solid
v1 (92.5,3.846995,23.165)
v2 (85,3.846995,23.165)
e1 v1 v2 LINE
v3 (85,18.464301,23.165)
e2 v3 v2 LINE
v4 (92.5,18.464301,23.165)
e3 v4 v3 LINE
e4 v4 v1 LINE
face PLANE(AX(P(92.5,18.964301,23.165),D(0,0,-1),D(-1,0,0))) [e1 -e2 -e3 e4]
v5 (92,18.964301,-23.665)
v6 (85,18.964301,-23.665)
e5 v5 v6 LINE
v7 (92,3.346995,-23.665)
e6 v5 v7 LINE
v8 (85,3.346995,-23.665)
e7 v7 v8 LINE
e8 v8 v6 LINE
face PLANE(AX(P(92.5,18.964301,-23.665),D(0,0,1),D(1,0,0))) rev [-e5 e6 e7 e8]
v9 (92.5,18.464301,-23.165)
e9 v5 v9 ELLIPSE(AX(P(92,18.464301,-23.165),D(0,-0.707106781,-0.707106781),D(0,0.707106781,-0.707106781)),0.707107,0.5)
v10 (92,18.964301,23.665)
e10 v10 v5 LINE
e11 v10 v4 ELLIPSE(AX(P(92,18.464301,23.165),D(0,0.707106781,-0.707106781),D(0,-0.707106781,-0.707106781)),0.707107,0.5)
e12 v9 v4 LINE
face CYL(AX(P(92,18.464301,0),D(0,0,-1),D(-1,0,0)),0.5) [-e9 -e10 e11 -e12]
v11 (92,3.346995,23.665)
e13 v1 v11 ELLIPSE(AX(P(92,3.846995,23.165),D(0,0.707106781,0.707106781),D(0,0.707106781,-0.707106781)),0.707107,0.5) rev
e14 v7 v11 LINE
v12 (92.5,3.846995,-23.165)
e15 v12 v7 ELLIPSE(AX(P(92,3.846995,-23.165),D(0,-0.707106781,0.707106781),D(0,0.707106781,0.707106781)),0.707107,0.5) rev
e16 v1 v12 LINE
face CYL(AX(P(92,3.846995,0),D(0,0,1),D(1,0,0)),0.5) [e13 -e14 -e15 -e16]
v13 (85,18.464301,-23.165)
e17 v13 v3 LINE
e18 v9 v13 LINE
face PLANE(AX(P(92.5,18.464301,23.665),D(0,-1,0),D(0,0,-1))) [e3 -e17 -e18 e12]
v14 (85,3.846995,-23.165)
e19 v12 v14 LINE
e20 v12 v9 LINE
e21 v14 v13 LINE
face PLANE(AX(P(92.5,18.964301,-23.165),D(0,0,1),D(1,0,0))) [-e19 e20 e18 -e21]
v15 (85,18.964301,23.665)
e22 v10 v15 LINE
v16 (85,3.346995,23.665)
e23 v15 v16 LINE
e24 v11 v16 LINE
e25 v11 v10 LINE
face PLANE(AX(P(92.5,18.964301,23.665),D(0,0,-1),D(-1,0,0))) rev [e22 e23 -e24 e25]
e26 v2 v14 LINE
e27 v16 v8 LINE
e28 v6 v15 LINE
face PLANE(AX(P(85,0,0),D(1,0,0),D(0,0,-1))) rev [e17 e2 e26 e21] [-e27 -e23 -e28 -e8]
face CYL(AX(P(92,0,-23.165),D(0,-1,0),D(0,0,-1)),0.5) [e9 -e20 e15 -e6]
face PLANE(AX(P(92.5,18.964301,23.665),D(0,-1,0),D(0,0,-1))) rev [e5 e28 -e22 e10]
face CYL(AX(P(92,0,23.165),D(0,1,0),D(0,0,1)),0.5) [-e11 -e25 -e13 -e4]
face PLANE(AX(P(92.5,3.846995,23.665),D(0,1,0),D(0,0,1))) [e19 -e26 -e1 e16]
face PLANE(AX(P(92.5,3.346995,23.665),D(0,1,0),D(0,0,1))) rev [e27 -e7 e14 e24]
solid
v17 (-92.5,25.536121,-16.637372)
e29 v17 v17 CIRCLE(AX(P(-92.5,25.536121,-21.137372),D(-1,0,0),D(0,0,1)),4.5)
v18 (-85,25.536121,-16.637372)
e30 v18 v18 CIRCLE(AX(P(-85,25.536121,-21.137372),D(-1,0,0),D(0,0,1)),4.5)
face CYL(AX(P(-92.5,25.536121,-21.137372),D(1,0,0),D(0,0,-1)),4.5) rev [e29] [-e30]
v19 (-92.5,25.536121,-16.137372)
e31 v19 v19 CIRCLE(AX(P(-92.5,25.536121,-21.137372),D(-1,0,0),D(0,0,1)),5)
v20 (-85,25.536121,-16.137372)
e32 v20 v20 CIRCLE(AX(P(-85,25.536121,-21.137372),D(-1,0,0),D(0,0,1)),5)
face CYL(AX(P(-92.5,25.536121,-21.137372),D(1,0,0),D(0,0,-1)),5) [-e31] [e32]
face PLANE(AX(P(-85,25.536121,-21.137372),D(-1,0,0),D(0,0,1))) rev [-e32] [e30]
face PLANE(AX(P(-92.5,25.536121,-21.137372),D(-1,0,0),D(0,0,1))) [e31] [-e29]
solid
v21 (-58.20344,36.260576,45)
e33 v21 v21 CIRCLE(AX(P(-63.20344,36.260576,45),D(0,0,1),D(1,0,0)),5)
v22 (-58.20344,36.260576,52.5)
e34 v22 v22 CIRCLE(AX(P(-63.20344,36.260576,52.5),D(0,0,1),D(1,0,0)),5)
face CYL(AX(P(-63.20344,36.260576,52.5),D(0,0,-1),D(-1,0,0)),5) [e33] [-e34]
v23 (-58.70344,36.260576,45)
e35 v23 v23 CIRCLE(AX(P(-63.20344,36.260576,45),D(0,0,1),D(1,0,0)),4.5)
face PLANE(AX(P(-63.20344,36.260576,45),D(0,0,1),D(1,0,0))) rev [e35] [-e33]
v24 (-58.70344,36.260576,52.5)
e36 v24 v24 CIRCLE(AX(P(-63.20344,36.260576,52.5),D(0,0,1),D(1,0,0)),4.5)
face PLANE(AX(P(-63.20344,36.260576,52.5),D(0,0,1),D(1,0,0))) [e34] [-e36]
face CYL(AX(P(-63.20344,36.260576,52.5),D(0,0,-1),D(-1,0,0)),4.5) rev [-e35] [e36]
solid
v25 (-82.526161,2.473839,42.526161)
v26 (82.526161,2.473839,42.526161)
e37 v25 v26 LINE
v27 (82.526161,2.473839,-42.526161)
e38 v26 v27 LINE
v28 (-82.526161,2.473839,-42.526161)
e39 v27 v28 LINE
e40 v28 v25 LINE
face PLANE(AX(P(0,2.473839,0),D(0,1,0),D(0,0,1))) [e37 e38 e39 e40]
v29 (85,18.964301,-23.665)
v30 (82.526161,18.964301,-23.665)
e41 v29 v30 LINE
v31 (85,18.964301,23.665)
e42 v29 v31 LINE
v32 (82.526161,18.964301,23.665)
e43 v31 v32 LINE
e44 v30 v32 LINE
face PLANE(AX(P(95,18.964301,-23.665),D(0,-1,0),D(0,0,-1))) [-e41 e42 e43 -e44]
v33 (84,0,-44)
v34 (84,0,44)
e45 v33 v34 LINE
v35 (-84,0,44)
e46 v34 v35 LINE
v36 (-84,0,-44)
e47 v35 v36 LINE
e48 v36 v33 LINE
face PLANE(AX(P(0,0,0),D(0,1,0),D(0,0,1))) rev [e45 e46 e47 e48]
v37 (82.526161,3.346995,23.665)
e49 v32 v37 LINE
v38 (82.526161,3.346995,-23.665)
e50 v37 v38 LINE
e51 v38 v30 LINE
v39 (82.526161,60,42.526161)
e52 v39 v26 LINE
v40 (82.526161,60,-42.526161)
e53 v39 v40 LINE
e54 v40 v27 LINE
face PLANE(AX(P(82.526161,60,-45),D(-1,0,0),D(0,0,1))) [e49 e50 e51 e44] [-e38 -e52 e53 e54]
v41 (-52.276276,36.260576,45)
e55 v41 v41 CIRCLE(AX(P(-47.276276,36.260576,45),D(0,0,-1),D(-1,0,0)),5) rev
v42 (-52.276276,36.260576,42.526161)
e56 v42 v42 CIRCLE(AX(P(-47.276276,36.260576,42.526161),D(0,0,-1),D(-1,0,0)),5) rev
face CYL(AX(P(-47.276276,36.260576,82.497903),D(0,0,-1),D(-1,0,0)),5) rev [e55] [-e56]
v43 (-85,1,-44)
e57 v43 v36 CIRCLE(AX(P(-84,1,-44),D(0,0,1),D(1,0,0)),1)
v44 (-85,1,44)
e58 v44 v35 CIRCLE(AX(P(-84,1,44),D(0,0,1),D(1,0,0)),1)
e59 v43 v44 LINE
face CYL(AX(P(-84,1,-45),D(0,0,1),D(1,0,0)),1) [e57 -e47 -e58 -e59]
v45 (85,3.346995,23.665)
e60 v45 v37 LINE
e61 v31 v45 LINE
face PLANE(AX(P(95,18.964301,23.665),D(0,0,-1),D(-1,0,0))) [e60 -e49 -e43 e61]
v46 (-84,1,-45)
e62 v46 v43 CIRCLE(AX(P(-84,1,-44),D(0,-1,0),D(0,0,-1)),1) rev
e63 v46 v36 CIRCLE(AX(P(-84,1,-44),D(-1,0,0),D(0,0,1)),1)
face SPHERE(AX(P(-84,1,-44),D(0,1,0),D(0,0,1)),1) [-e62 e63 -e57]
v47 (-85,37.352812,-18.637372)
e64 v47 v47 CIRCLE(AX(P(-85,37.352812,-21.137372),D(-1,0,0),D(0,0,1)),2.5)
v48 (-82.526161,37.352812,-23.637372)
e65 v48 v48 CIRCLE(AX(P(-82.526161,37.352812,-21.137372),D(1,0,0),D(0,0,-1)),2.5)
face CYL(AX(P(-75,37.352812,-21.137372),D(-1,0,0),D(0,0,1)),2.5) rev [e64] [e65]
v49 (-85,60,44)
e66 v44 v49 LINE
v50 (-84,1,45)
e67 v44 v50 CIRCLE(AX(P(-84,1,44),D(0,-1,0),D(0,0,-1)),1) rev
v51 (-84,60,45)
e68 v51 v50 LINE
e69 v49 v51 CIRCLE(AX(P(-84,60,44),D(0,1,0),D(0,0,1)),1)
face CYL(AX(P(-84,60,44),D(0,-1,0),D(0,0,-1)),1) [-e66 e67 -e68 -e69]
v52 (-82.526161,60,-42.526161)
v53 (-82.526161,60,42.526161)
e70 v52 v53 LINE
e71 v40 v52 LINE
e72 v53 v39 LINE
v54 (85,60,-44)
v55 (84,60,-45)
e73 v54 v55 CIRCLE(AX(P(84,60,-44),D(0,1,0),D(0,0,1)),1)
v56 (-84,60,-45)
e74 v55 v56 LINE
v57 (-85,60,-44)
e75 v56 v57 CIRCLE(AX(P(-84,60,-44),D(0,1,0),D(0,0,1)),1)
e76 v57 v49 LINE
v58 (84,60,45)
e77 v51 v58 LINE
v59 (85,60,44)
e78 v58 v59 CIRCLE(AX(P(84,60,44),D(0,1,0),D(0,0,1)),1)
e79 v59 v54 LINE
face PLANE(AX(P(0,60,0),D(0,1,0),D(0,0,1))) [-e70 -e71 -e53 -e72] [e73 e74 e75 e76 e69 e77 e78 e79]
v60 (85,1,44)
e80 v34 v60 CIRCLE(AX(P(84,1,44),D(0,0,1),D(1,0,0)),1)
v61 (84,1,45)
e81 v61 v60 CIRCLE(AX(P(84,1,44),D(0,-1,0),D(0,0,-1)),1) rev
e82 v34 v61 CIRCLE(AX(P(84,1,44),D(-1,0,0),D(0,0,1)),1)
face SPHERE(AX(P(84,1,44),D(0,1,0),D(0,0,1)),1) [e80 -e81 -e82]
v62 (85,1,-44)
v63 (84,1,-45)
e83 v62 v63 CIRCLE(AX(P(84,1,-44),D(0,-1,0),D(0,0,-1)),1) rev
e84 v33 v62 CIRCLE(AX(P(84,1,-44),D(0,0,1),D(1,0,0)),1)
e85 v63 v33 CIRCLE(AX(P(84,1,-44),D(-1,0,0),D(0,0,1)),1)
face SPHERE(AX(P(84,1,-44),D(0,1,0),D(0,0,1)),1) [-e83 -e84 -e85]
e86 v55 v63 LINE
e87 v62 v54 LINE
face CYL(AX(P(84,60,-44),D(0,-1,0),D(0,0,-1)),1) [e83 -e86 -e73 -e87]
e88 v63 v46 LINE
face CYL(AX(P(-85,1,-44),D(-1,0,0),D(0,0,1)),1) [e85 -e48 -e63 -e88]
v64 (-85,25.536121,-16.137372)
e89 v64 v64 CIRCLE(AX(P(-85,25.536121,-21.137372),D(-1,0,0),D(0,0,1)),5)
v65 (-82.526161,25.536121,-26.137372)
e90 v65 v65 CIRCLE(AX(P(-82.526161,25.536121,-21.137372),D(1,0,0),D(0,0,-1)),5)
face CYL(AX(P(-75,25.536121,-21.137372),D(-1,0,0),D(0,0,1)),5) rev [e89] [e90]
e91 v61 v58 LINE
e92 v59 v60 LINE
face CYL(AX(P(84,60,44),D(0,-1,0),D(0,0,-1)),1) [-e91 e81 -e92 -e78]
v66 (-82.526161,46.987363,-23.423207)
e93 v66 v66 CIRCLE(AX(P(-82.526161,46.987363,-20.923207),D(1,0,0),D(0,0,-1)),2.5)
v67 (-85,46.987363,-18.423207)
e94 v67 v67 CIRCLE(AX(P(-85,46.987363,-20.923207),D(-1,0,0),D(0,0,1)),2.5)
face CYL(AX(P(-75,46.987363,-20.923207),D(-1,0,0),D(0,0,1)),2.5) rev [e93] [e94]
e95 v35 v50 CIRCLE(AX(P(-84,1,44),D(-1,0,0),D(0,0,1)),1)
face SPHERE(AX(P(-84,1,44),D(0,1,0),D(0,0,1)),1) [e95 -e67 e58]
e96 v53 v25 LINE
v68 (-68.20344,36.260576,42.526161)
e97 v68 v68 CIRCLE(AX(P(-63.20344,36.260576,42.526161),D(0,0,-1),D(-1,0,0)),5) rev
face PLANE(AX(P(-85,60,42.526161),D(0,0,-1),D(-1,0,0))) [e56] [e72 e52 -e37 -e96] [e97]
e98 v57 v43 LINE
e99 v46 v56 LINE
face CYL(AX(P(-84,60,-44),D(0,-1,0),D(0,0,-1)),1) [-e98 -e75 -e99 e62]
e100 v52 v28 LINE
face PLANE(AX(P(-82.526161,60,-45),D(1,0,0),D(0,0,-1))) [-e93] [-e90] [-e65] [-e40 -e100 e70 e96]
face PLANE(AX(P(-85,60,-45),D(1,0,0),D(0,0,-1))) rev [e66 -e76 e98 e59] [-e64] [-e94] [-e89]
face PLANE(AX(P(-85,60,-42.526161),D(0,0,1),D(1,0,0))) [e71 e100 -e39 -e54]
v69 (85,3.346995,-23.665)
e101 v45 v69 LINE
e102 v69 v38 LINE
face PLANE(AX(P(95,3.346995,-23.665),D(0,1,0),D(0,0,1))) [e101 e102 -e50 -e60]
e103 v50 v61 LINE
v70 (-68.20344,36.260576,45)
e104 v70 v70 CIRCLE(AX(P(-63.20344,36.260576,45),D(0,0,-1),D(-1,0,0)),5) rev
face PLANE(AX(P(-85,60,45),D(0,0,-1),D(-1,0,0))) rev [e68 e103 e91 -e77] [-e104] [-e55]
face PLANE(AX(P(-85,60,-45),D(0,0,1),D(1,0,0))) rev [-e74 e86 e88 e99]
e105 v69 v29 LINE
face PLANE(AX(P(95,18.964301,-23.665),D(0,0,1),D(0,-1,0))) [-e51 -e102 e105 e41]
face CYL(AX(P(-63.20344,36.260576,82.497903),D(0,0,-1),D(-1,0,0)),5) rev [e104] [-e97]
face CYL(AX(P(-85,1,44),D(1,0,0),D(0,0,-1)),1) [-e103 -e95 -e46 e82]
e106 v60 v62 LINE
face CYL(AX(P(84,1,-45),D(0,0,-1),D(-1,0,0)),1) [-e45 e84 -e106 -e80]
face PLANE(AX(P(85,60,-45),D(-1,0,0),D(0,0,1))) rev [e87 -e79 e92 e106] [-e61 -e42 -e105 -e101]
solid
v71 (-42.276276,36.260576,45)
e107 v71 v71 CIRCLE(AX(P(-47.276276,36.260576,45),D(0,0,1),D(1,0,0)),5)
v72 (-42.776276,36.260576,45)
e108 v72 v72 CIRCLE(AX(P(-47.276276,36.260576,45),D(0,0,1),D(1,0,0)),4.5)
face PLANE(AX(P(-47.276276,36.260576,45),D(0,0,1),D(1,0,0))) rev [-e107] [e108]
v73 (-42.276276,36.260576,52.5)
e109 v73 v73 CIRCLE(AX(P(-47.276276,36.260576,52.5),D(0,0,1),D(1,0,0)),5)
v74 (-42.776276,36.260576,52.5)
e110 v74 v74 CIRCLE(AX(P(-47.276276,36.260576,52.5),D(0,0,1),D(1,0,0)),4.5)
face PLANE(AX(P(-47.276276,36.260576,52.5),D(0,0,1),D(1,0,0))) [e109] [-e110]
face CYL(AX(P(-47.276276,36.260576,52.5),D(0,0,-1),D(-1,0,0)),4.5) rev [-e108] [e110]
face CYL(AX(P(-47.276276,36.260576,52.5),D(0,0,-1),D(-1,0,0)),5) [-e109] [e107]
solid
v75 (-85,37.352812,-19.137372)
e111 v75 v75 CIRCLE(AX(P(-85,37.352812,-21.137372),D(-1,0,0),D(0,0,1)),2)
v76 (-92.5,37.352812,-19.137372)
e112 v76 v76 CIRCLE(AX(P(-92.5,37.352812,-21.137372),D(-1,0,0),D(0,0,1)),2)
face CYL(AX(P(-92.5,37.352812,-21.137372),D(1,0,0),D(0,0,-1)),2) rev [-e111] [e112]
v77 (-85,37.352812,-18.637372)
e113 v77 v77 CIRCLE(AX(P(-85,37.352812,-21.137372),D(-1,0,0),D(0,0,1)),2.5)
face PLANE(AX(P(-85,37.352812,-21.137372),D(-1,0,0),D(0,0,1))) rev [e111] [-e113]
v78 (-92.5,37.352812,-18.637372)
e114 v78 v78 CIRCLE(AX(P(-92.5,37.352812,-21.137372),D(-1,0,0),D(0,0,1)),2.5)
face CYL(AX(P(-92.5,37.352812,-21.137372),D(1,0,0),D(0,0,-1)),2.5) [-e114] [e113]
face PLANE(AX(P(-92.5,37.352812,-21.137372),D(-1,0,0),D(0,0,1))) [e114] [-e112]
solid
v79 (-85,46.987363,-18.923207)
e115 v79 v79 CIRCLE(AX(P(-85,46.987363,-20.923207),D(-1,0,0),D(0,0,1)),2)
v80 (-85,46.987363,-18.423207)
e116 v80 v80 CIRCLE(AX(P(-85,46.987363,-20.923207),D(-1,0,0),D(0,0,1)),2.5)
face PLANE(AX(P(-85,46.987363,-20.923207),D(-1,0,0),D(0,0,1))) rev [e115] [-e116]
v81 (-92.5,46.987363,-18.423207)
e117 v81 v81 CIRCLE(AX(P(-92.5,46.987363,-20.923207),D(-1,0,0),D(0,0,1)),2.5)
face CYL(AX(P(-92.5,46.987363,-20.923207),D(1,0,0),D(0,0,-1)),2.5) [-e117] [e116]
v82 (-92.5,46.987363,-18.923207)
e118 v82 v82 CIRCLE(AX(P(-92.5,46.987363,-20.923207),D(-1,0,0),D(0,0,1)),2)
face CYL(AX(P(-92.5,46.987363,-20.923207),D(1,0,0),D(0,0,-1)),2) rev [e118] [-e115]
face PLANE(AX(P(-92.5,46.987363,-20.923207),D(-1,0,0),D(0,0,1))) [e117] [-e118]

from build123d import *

# Parameters (mm, degrees)
SKETCH1_W             = 170
SKETCH1_H             = 90
BOSS_EXTRUDE2_DEPTH   = 60
SHELL2_T              = -2.473839036
SKETCH4_W             = 47.329999632
SKETCH4_H             = 15.617306276
CUT_EXTRUDE3_DEPTH    = 95
SKETCH5_R             = 5
CUT_EXTRUDE4_DEPTH    = 82.49790304
SKETCH11_R            = 2.5
CUT_EXTRUDE5_DEPTH    = 10
SKETCH12_R            = 2.5
CUT_EXTRUDE6_DEPTH    = 10
SKETCH13_R            = 5
CUT_EXTRUDE7_DEPTH    = 10
SKETCH18_R            = 2.5
BOSS_EXTRUDE4_DEPTH   = 7.5
SHELL5_T              = -0.5
SKETCH19_R            = 2.5
BOSS_EXTRUDE5_DEPTH   = 7.5
SHELL6_T              = -0.5
SKETCH20_R            = 5
BOSS_EXTRUDE6_DEPTH   = 7.5
SHELL7_T              = -0.5
SKETCH21_R            = 5
BOSS_EXTRUDE7_DEPTH   = 7.5
BOSS_EXTRUDE7_2_DEPTH = 7.5
SHELL8_T              = -0.5
SHELL9_T              = -0.5
SKETCH23_W            = 47.329999632
SKETCH23_H            = 15.617306276
BOSS_EXTRUDE8_DEPTH   = 7.5
SHELL10_T             = -0.5
FILLET1_START         = 2
FILLET1_DEPTH         = 18
FILLET1_START_2       = -25
FILLET1_2_DEPTH       = 50
FILLET3_R             = 1
FILLET4_R             = 1


with BuildPart() as part:
    # Sketch1 → Boss-Extrude2 (new body)
    with BuildSketch(Plane(origin=(0, 0, 0), x_dir=(1, 0, 0), z_dir=(0, 1, 0))):
        Rectangle(SKETCH1_W, SKETCH1_H)
    extrude(amount=BOSS_EXTRUDE2_DEPTH)

    # Shell2
    shell2_openings = [part.faces().sort_by_distance(p)[0] for p in [
        (0, 60, 0),
    ]]
    offset(amount=SHELL2_T, openings=shell2_openings, kind=Kind.INTERSECTION)

    # Sketch4 → Cut-Extrude3 (cut)
    with BuildSketch(Plane(origin=(0, 0, 0), x_dir=(0, 0, -1), z_dir=(1, 0, 0))):
        with Locations((0, 11.155648294)):
            Rectangle(SKETCH4_W, SKETCH4_H)
    extrude(amount=CUT_EXTRUDE3_DEPTH, mode=Mode.SUBTRACT)

    # Sketch5 → Cut-Extrude4 (cut)
    with BuildSketch(Plane.XY):
        with Locations(Location((-63.203440073, 36.260575633, 0), (0, 0, 180))):
            Circle(SKETCH5_R)
        with Locations(Location((-47.276275906, 36.260575633, 0), (0, 0, 180))):
            Circle(SKETCH5_R)
    extrude(amount=CUT_EXTRUDE4_DEPTH, mode=Mode.SUBTRACT)

    # Sketch11 → Cut-Extrude5 (cut)
    with BuildSketch(Plane.ZY.offset(85)):
        with Locations((-20.923207268, 46.987362625)):
            Circle(SKETCH11_R)
    extrude(amount=-CUT_EXTRUDE5_DEPTH, mode=Mode.SUBTRACT)

    # Sketch12 → Cut-Extrude6 (cut)
    with BuildSketch(Plane.ZY.offset(85)):
        with Locations((-21.137371962, 37.352812096)):
            Circle(SKETCH12_R)
    extrude(amount=-CUT_EXTRUDE6_DEPTH, mode=Mode.SUBTRACT)

    # Sketch13 → Cut-Extrude7 (cut)
    with BuildSketch(Plane.ZY.offset(85)):
        with Locations((-21.137371962, 25.536121377)):
            Circle(SKETCH13_R)
    extrude(amount=-CUT_EXTRUDE7_DEPTH, mode=Mode.SUBTRACT)

    # Fillet3
    fillet3_edges = [part.edges().sort_by_distance(p)[0] for p in [
        (85, 30, 45),
        (-85, 30, 45),
        (-85, 30, -45),
        (85, 30, -45),
    ]]
    fillet(fillet3_edges, radius=FILLET3_R)

    # Fillet4
    fillet4_edges = [part.edges().sort_by_distance(p)[0] for p in [
        (-85, 0, 0),
        (85, 0, 0),
        (0, 0, 45),
        (0, 0, -45),
        (84.707106781, 0, 44.707106781),
        (-84.707106781, 0, 44.707106781),
        (84.707106781, 0, -44.707106781),
        (-84.707106781, 0, -44.707106781),
    ]]
    fillet(fillet4_edges, radius=FILLET4_R)


with BuildPart() as body_2:
    # Sketch18 → Boss-Extrude4 (new body)
    with BuildSketch(Plane.ZY.offset(85)):
        with Locations((-20.923207268, 46.987362625)):
            Circle(SKETCH18_R)
    extrude(amount=BOSS_EXTRUDE4_DEPTH)

    # Shell5
    shell5_openings = [body_2.faces().sort_by_distance(p)[0] for p in [
        (-92.5, 46.987362625, -20.923207268),
        (-85, 46.987362625, -20.923207268),
    ]]
    offset(amount=SHELL5_T, openings=shell5_openings, kind=Kind.INTERSECTION)


with BuildPart() as body_3:
    # Sketch19 → Boss-Extrude5 (new body)
    with BuildSketch(Plane.ZY.offset(85)):
        with Locations((-21.137371962, 37.352812096)):
            Circle(SKETCH19_R)
    extrude(amount=BOSS_EXTRUDE5_DEPTH)

    # Shell6
    shell6_openings = [body_3.faces().sort_by_distance(p)[0] for p in [
        (-92.5, 37.352812096, -21.137371962),
        (-85, 37.352812096, -21.137371962),
    ]]
    offset(amount=SHELL6_T, openings=shell6_openings, kind=Kind.INTERSECTION)


with BuildPart() as body_4:
    # Sketch20 → Boss-Extrude6 (new body)
    with BuildSketch(Plane.ZY.offset(85)):
        with Locations((-21.137371962, 25.536121377)):
            Circle(SKETCH20_R)
    extrude(amount=BOSS_EXTRUDE6_DEPTH)

    # Shell7
    shell7_openings = [body_4.faces().sort_by_distance(p)[0] for p in [
        (-92.5, 25.536121377, -21.137371962),
        (-85, 25.536121377, -21.137371962),
    ]]
    offset(amount=SHELL7_T, openings=shell7_openings, kind=Kind.INTERSECTION)


with BuildPart() as body_5:
    # Sketch21 → Boss-Extrude7 (new body)
    with BuildSketch(Plane.XY.offset(45)):
        with Locations((-63.203440073, 36.260575633)):
            Circle(SKETCH21_R)
    extrude(amount=BOSS_EXTRUDE7_DEPTH)

    # Shell8
    shell8_openings = [body_5.faces().sort_by_distance(p)[0] for p in [
        (-63.203440073, 36.260575633, 52.5),
        (-63.203440073, 36.260575633, 45),
    ]]
    offset(amount=SHELL8_T, openings=shell8_openings, kind=Kind.INTERSECTION)


with BuildPart() as body_6:
    # Sketch21 → Boss-Extrude7 2 (new body)
    with BuildSketch(Plane.XY.offset(45)):
        with Locations((-47.276275906, 36.260575633)):
            Circle(SKETCH21_R)
    extrude(amount=BOSS_EXTRUDE7_2_DEPTH)

    # Shell9
    shell9_openings = [body_6.faces().sort_by_distance(p)[0] for p in [
        (-47.276275906, 36.260575633, 52.5),
        (-47.276275906, 36.260575633, 45),
    ]]
    offset(amount=SHELL9_T, openings=shell9_openings, kind=Kind.INTERSECTION)


with BuildPart() as body_7:
    # Sketch23 → Boss-Extrude8 (new body)
    with BuildSketch(Plane(origin=(85, 0, 0), x_dir=(0, 0, -1), z_dir=(1, 0, 0))):
        with Locations((0, 11.155648294)):
            Rectangle(SKETCH23_W, SKETCH23_H)
    extrude(amount=BOSS_EXTRUDE8_DEPTH)

    # Shell10
    shell10_openings = [body_7.faces().sort_by_distance(p)[0] for p in [
        (92.5, 11.155648294, 0),
        (85, 11.155648294, 0),
    ]]
    offset(amount=SHELL10_T, openings=shell10_openings, kind=Kind.INTERSECTION)

    # Fillet1: read off the stored shape, not the designer's step
    # Fillet1 outline → Fillet1 (cut)
    with BuildSketch(Plane(origin=(0, 0, 0), x_dir=(1, 0, 0), z_dir=(0, 1, 0)).offset(FILLET1_START)):
        with BuildLine():
            ThreePointArc((92, 23.664999816), (92.353553391, 23.518553207), (92.5, 23.164999816))
            Line((92.5, 23.164999816), (92.5, 23.664999816))
            Line((92.5, 23.664999816), (92, 23.664999816))
        make_face()
        with BuildLine():
            ThreePointArc((92.5, -23.164999816), (92.353553391, -23.518553207), (92, -23.664999816))
            Line((92, -23.664999816), (92.5, -23.664999816))
            Line((92.5, -23.664999816), (92.5, -23.164999816))
        make_face()
    extrude(amount=FILLET1_DEPTH, mode=Mode.SUBTRACT)

    # Fillet1 2 outline → Fillet1 2 (cut)
    with BuildSketch(Plane.XY.offset(FILLET1_START_2)):
        with BuildLine():
            ThreePointArc((92.5, 3.846995156), (92.35355339, 3.493441765), (92, 3.346995156))
            Line((92, 3.346995156), (92.5, 3.346995156))
            Line((92.5, 3.346995156), (92.5, 3.846995156))
        make_face()
        with BuildLine():
            Line((92.5, 18.964301432), (92, 18.964301432))
            ThreePointArc((92, 18.964301432), (92.353553391, 18.817854823), (92.5, 18.464301432))
            Line((92.5, 18.464301432), (92.5, 18.964301432))
        make_face()
    extrude(amount=FILLET1_2_DEPTH, mode=Mode.SUBTRACT)


solid = Compound([part.part, body_2.part, body_3.part, body_4.part, body_5.part, body_6.part, body_7.part])
